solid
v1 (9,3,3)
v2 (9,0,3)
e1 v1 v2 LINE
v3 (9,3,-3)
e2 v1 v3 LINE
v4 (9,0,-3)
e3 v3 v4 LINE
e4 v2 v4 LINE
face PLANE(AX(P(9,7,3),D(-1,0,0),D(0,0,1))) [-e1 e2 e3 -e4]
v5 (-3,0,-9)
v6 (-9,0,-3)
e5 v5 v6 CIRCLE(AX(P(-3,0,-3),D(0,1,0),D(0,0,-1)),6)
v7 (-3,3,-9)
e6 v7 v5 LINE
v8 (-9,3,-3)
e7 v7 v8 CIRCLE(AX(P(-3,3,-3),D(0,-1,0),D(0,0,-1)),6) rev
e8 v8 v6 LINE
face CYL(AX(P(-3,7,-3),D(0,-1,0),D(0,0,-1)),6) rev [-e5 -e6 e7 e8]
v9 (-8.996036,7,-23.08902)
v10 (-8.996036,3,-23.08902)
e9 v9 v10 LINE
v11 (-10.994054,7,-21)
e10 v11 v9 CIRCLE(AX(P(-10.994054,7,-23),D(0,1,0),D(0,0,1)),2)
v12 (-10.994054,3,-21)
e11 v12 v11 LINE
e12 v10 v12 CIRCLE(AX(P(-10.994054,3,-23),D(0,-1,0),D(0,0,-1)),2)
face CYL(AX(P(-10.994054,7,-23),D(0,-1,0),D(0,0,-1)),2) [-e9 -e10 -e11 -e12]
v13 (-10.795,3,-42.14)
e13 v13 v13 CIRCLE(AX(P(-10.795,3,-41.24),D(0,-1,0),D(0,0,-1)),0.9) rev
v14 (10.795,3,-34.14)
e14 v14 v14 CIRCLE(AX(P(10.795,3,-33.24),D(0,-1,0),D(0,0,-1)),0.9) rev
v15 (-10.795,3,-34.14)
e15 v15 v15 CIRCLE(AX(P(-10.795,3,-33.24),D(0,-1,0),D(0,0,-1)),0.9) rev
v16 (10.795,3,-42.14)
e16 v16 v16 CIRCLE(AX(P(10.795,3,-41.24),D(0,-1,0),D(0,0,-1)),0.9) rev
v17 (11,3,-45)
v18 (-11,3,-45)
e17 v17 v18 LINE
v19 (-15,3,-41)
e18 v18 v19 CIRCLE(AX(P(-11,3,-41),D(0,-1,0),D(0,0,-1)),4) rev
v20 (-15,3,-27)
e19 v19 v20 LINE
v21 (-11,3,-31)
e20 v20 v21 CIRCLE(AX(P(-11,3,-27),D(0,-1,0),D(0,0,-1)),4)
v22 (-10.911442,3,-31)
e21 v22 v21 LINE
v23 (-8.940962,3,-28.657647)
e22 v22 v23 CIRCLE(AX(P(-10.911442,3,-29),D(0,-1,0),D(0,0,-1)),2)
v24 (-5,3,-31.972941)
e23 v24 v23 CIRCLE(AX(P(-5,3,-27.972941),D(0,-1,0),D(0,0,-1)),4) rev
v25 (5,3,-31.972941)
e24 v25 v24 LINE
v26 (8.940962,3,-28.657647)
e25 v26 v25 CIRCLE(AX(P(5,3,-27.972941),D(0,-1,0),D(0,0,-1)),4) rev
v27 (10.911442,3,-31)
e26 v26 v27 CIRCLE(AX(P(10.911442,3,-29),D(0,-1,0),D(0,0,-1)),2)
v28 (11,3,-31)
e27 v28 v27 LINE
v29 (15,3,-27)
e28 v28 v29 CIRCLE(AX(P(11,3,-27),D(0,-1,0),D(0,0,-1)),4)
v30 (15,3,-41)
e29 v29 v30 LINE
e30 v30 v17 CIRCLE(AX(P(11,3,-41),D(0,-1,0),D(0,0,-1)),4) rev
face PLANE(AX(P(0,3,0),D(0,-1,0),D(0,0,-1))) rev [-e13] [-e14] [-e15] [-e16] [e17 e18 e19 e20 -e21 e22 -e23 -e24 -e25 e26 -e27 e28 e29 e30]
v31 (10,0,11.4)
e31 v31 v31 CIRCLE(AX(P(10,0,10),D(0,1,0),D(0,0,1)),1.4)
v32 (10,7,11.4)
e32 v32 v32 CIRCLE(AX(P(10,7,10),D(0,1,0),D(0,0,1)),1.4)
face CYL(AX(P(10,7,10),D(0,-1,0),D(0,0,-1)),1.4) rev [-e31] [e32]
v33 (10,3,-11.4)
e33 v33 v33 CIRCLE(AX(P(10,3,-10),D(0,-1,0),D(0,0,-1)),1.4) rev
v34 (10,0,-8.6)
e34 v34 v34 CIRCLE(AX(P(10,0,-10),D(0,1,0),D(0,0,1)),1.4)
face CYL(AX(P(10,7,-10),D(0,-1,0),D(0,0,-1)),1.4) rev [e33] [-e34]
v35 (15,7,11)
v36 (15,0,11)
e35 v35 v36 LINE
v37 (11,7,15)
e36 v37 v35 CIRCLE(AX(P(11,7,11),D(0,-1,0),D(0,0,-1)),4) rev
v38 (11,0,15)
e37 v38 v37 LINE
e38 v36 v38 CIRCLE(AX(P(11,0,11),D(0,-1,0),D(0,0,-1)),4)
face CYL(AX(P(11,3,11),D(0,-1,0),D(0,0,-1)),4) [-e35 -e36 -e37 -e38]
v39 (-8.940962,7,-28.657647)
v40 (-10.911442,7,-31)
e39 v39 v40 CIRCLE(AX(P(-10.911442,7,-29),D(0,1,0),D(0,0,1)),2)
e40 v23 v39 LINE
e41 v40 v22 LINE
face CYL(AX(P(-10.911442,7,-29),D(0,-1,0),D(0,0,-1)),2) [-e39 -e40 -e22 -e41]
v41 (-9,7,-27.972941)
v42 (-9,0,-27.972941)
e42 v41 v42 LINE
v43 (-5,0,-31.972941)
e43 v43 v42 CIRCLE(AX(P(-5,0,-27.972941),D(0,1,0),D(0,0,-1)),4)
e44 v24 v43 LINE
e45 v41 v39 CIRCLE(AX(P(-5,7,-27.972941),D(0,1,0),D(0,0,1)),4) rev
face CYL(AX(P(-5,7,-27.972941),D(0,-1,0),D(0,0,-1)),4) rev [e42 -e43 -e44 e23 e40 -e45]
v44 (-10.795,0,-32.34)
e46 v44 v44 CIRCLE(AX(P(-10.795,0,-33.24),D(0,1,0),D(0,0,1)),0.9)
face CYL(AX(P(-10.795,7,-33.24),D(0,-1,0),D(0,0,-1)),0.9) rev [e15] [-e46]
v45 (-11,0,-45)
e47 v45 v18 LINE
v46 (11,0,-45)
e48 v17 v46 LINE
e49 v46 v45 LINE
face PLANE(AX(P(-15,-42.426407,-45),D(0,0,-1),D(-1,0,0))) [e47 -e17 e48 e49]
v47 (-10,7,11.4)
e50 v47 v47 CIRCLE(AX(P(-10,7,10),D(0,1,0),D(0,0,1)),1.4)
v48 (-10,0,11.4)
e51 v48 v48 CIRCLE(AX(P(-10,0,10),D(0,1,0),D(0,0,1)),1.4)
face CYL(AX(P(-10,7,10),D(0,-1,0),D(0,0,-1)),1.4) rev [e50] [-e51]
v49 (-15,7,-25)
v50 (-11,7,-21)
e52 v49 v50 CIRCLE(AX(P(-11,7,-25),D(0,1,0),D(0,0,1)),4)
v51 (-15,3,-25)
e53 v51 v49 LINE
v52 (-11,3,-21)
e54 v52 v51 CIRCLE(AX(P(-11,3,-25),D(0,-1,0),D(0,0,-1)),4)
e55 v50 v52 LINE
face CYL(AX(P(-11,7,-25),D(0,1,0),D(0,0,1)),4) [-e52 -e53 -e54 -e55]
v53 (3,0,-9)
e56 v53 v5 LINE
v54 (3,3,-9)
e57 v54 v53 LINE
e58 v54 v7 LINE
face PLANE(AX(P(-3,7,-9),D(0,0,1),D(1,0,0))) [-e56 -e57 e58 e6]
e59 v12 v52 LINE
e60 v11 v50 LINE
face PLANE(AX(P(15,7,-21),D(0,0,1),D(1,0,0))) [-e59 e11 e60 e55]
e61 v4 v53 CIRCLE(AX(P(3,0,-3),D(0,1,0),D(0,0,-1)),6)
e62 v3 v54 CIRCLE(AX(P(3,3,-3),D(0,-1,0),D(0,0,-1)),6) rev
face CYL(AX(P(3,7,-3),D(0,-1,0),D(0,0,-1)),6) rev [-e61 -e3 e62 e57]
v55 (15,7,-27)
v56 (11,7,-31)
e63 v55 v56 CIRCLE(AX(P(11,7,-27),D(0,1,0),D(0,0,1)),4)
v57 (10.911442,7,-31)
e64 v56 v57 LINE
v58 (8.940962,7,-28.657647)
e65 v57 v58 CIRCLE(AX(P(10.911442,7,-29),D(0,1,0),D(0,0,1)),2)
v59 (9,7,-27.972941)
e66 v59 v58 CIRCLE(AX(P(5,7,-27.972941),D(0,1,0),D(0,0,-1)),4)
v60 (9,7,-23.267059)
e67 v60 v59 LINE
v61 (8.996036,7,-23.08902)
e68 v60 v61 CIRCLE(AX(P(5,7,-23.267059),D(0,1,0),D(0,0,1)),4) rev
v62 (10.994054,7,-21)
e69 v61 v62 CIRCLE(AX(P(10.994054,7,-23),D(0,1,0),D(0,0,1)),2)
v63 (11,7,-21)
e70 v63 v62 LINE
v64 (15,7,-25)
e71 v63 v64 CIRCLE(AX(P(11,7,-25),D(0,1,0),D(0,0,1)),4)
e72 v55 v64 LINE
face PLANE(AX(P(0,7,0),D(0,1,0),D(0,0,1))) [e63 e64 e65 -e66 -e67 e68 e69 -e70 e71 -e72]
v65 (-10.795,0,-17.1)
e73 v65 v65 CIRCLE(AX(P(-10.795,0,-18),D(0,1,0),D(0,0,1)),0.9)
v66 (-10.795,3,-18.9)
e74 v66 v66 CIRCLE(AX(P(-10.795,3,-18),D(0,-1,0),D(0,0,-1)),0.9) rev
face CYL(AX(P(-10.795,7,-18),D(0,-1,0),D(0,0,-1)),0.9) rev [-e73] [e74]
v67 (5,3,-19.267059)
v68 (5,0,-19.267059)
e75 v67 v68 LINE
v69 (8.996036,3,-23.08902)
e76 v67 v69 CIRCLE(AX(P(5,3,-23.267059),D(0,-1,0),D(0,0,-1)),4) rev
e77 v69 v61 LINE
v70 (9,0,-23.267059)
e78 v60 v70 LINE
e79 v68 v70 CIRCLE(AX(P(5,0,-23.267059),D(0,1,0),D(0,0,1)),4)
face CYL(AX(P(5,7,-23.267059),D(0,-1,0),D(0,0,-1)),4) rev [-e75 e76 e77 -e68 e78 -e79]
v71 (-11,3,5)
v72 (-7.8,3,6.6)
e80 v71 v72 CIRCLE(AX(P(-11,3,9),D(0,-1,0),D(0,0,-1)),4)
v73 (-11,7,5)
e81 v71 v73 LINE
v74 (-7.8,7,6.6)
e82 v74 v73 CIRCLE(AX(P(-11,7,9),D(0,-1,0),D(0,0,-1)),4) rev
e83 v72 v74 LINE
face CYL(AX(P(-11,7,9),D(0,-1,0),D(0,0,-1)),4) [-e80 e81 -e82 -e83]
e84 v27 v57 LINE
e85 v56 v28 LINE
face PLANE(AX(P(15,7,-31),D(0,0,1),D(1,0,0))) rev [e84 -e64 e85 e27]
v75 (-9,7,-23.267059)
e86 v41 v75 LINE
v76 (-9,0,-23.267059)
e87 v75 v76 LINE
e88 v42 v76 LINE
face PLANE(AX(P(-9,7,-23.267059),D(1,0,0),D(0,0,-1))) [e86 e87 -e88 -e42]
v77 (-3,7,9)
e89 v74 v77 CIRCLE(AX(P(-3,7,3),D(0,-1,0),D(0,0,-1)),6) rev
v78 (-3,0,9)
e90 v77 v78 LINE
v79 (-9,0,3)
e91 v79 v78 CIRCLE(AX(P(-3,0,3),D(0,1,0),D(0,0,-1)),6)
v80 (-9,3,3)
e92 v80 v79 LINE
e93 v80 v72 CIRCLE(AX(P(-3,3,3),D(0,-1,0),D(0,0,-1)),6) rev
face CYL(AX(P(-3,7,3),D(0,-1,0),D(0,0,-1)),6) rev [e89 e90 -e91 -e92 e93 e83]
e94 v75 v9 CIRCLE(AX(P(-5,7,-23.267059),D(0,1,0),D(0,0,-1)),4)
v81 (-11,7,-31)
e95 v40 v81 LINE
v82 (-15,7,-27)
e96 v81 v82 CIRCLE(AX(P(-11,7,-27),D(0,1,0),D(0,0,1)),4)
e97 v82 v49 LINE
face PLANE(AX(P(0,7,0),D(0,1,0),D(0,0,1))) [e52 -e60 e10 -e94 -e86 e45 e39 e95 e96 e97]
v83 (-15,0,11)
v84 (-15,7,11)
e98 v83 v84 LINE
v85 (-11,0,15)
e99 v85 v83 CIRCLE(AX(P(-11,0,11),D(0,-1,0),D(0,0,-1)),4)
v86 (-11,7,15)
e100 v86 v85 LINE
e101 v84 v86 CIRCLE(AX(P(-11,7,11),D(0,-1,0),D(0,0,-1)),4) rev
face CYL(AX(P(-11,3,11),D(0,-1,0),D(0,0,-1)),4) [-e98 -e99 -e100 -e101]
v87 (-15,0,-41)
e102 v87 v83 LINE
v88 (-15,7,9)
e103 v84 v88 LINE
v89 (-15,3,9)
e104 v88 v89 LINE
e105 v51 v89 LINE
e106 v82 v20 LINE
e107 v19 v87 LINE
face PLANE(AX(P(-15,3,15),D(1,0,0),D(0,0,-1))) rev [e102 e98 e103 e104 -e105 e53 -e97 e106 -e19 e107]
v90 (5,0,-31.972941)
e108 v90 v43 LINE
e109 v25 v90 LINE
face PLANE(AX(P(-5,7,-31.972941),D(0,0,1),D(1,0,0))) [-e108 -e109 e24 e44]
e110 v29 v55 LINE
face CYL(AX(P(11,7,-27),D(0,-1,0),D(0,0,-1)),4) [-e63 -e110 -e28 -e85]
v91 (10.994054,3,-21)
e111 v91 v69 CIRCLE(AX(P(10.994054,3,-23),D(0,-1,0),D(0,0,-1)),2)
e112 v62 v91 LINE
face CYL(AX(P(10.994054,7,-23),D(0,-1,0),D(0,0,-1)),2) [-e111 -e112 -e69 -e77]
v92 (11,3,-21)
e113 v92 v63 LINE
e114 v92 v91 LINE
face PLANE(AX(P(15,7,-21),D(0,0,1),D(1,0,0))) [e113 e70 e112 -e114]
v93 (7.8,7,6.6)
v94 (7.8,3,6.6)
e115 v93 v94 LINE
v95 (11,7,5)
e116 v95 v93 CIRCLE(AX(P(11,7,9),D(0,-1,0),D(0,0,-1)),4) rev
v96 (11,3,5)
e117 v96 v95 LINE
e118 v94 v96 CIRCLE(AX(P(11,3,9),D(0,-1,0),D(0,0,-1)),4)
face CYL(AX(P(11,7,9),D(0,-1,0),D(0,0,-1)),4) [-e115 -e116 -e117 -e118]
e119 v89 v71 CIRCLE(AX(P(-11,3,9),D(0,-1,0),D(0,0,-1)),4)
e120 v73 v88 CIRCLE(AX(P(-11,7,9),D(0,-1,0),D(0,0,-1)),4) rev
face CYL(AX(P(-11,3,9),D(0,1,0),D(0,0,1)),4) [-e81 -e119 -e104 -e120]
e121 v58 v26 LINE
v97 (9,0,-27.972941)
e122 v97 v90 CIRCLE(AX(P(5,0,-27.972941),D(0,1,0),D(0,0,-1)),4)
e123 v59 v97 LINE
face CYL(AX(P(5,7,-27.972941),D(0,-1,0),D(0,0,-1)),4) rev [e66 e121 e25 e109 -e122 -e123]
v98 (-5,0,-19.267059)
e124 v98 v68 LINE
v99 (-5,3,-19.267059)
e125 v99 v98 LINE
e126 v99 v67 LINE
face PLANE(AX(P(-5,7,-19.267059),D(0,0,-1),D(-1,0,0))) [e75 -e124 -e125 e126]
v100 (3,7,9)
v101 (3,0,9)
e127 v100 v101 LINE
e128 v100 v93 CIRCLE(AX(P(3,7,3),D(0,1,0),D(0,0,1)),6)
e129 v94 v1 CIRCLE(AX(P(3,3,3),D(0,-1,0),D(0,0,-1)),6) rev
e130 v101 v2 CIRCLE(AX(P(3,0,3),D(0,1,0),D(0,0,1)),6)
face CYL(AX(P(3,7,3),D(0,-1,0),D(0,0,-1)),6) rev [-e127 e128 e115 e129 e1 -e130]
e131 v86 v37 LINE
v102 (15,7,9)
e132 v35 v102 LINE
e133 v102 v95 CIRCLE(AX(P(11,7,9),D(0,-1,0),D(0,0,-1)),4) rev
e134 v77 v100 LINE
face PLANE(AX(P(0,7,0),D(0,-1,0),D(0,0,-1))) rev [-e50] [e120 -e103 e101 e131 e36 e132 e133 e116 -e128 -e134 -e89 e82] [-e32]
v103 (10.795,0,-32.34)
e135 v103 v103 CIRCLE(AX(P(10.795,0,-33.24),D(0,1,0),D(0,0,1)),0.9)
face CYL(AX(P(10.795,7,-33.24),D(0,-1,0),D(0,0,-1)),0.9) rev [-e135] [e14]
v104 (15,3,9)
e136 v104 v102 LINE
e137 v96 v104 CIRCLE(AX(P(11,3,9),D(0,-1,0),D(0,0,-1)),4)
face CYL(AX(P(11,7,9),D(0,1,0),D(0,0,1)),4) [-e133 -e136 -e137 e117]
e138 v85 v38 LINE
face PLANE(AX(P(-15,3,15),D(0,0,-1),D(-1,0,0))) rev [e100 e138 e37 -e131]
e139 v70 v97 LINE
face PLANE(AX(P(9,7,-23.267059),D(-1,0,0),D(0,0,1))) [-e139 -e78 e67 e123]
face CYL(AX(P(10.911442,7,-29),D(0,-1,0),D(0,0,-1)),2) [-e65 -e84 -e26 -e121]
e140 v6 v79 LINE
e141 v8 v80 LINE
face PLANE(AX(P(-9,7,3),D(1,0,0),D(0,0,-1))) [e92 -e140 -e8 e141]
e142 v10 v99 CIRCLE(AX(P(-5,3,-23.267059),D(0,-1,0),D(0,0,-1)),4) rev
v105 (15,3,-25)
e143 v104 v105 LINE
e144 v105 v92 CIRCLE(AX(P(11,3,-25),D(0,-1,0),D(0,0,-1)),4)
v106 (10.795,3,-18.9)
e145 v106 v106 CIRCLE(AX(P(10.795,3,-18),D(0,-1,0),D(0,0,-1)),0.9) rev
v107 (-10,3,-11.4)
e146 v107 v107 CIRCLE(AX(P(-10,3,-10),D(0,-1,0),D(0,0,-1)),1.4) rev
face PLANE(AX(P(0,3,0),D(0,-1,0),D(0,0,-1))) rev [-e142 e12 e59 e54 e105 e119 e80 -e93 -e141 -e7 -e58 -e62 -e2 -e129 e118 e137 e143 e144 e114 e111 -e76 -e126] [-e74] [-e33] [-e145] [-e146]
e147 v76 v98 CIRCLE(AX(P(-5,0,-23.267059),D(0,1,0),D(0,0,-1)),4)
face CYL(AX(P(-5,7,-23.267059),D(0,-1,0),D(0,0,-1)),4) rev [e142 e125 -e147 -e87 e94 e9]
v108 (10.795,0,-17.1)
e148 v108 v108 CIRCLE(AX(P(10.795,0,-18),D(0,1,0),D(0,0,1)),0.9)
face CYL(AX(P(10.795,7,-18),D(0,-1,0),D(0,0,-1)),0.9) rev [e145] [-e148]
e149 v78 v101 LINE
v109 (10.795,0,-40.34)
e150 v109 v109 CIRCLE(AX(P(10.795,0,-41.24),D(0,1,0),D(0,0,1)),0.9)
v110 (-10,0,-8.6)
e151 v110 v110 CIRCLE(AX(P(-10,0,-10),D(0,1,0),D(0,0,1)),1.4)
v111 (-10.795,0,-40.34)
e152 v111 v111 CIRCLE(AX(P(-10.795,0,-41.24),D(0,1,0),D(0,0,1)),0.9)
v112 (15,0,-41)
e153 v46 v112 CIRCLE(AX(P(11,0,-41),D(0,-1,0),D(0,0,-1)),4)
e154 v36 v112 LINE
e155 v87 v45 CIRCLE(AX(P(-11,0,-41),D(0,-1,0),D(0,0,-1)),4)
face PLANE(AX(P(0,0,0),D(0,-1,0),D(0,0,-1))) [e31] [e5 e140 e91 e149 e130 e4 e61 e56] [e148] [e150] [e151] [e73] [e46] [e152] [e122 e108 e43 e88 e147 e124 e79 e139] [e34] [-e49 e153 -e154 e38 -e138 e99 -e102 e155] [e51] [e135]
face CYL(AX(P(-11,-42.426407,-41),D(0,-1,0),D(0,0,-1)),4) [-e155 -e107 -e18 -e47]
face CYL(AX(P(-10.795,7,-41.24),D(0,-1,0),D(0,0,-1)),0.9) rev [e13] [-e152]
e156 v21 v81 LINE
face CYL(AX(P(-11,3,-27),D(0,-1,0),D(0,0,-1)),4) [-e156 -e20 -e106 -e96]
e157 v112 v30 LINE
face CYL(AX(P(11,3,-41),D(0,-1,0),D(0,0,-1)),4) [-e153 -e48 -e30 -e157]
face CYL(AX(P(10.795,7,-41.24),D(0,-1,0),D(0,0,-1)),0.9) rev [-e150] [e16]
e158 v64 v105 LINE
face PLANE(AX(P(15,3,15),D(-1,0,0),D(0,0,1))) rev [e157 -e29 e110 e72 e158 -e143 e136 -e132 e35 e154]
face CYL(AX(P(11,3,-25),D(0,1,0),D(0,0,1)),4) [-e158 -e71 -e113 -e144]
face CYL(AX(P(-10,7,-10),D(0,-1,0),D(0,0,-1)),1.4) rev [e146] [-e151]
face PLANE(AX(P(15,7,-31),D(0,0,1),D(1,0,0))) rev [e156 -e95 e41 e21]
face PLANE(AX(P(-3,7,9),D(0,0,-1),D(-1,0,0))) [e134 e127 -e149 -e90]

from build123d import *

# Parameters (mm, degrees)
SKETCH1_W               = 30
SKETCH1_H               = 30
BOSS_EXTRUDE1_DEPTH     = 3
SKETCH3_W               = 30
SKETCH3_H               = 30
BOSS_EXTRUDE2_DEPTH     = 3
SKETCH4_W               = 30
SKETCH4_H               = 10
BOSS_EXTRUDE3_DEPTH     = 4
CUT_EXTRUDE1_DEPTH      = 48.602520942
CUT_EXTRUDE1_DEPTH_BACK = 48.602520942
SKETCH2_R               = 1.4
SKETCH2_R_2             = 0.9
FILLET1_R               = 4
FILLET2_R               = 2


with BuildPart() as part:
    # Sketch1 → Boss-Extrude1 (new body)
    with BuildSketch(Plane(origin=(0, 0, 0), x_dir=(1, 0, 0), z_dir=(0, 1, 0))):
        Rectangle(SKETCH1_W, SKETCH1_H)
    extrude(amount=BOSS_EXTRUDE1_DEPTH)

    # Sketch3 → Boss-Extrude2 (add)
    with BuildSketch(Plane(origin=(0, 3, 0), x_dir=(1, 0, 0), z_dir=(0, 1, 0))):
        with Locations((0, 30)):
            Rectangle(SKETCH3_W, SKETCH3_H)
    extrude(amount=-BOSS_EXTRUDE2_DEPTH)

    # Sketch4 → Boss-Extrude3 (add)
    with BuildSketch(Plane(origin=(0, 3, 0), x_dir=(1, 0, 0), z_dir=(0, 1, 0))):
        with Locations((0, -10)):
            Rectangle(SKETCH4_W, SKETCH4_H)
        with Locations((0, 26)):
            Rectangle(SKETCH4_W, SKETCH4_H)
    extrude(amount=BOSS_EXTRUDE3_DEPTH)

    # Sketch2 → Cut-Extrude1 (cut, two sides: drawn at the far end of the back side and taken through both)
    with BuildSketch(Plane(origin=(0, 3, 0), x_dir=(1, 0, 0), z_dir=(0, 1, 0)).offset(-CUT_EXTRUDE1_DEPTH_BACK)):
        with Locations(Location((-10, -10, 0), (0, 0, 270))):
            Circle(SKETCH2_R)
        with Locations(Location((10, -10, 0), (0, 0, 270))):
            Circle(SKETCH2_R)
        with Locations(Location((10, 10, 0), (0, 0, 90))):
            Circle(SKETCH2_R)
        with Locations(Location((-10, 10, 0), (0, 0, 90))):
            Circle(SKETCH2_R)
        with Locations(Location((-10.795, 33.24, 0), (0, 0, 90))):
            Circle(SKETCH2_R_2)
        with Locations(Location((10.795, 33.24, 0), (0, 0, 90))):
            Circle(SKETCH2_R_2)
        with Locations(Location((10.795, 18, 0), (0, 0, 90))):
            Circle(SKETCH2_R_2)
        with Locations(Location((-10.795, 18, 0), (0, 0, 90))):
            Circle(SKETCH2_R_2)
        with Locations(Location((-10.795, 41.24, 0), (0, 0, 90))):
            Circle(SKETCH2_R_2)
        with Locations(Location((10.795, 41.24, 0), (0, 0, 90))):
            Circle(SKETCH2_R_2)
        with BuildLine():
            Line((-3, -9), (3, -9))
            ThreePointArc((3, -9), (7.242640687, -7.242640687), (9, -3))
            Line((9, -3), (9, 3))
            ThreePointArc((9, 3), (7.242640687, 7.242640687), (3, 9))
            Line((3, 9), (-3, 9))
            ThreePointArc((-3, 9), (-7.242640687, 7.242640687), (-9, 3))
            Line((-9, 3), (-9, -3))
            ThreePointArc((-9, -3), (-7.242640687, -7.242640687), (-3, -9))
        make_face()
        with BuildLine():
            Line((-5, 19.267058824), (5, 19.267058824))
            ThreePointArc((5, 19.267058824), (7.828427125, 20.438631699), (9, 23.267058824))
            Line((9, 23.267058824), (9, 27.972941176))
            ThreePointArc((9, 27.972941176), (7.828427125, 30.801368301), (5, 31.972941176))
            Line((5, 31.972941176), (-5, 31.972941176))
            ThreePointArc((-5, 31.972941176), (-7.828427125, 30.801368301), (-9, 27.972941176))
            Line((-9, 27.972941176), (-9, 23.267058824))
            ThreePointArc((-9, 23.267058824), (-7.828427125, 20.438631699), (-5, 19.267058824))
        make_face()
    extrude(amount=CUT_EXTRUDE1_DEPTH + CUT_EXTRUDE1_DEPTH_BACK, mode=Mode.SUBTRACT)

    # Fillet1
    fillet1_edges = [part.edges().sort_by_distance(p)[0] for p in [
        (-15, 1.5, -45),
        (15, 1.5, -45),
        (15, 3.5, 15),
        (-15, 3.5, 15),
        (15, 5, 5),
        (8.656854249, 5, 5),
        (-8.656854249, 5, 5),
        (-15, 5, 5),
        (15, 5, -21),
        (15, 5, -31),
        (-15, 5, -21),
        (-15, 5, -31),
    ]]
    fillet(fillet1_edges, radius=FILLET1_R - 0.0001)  # a hair under: the kernel refuses the full size

    # Fillet2
    fillet2_edges = [part.edges().sort_by_distance(p)[0] for p in [
        (-8.29551882, 5, -21),
        (8.29551882, 5, -21),
        (7.614749487, 5, -31),
        (-7.614749487, 5, -31),
    ]]
    fillet(fillet2_edges, radius=FILLET2_R)


solid = part.part
